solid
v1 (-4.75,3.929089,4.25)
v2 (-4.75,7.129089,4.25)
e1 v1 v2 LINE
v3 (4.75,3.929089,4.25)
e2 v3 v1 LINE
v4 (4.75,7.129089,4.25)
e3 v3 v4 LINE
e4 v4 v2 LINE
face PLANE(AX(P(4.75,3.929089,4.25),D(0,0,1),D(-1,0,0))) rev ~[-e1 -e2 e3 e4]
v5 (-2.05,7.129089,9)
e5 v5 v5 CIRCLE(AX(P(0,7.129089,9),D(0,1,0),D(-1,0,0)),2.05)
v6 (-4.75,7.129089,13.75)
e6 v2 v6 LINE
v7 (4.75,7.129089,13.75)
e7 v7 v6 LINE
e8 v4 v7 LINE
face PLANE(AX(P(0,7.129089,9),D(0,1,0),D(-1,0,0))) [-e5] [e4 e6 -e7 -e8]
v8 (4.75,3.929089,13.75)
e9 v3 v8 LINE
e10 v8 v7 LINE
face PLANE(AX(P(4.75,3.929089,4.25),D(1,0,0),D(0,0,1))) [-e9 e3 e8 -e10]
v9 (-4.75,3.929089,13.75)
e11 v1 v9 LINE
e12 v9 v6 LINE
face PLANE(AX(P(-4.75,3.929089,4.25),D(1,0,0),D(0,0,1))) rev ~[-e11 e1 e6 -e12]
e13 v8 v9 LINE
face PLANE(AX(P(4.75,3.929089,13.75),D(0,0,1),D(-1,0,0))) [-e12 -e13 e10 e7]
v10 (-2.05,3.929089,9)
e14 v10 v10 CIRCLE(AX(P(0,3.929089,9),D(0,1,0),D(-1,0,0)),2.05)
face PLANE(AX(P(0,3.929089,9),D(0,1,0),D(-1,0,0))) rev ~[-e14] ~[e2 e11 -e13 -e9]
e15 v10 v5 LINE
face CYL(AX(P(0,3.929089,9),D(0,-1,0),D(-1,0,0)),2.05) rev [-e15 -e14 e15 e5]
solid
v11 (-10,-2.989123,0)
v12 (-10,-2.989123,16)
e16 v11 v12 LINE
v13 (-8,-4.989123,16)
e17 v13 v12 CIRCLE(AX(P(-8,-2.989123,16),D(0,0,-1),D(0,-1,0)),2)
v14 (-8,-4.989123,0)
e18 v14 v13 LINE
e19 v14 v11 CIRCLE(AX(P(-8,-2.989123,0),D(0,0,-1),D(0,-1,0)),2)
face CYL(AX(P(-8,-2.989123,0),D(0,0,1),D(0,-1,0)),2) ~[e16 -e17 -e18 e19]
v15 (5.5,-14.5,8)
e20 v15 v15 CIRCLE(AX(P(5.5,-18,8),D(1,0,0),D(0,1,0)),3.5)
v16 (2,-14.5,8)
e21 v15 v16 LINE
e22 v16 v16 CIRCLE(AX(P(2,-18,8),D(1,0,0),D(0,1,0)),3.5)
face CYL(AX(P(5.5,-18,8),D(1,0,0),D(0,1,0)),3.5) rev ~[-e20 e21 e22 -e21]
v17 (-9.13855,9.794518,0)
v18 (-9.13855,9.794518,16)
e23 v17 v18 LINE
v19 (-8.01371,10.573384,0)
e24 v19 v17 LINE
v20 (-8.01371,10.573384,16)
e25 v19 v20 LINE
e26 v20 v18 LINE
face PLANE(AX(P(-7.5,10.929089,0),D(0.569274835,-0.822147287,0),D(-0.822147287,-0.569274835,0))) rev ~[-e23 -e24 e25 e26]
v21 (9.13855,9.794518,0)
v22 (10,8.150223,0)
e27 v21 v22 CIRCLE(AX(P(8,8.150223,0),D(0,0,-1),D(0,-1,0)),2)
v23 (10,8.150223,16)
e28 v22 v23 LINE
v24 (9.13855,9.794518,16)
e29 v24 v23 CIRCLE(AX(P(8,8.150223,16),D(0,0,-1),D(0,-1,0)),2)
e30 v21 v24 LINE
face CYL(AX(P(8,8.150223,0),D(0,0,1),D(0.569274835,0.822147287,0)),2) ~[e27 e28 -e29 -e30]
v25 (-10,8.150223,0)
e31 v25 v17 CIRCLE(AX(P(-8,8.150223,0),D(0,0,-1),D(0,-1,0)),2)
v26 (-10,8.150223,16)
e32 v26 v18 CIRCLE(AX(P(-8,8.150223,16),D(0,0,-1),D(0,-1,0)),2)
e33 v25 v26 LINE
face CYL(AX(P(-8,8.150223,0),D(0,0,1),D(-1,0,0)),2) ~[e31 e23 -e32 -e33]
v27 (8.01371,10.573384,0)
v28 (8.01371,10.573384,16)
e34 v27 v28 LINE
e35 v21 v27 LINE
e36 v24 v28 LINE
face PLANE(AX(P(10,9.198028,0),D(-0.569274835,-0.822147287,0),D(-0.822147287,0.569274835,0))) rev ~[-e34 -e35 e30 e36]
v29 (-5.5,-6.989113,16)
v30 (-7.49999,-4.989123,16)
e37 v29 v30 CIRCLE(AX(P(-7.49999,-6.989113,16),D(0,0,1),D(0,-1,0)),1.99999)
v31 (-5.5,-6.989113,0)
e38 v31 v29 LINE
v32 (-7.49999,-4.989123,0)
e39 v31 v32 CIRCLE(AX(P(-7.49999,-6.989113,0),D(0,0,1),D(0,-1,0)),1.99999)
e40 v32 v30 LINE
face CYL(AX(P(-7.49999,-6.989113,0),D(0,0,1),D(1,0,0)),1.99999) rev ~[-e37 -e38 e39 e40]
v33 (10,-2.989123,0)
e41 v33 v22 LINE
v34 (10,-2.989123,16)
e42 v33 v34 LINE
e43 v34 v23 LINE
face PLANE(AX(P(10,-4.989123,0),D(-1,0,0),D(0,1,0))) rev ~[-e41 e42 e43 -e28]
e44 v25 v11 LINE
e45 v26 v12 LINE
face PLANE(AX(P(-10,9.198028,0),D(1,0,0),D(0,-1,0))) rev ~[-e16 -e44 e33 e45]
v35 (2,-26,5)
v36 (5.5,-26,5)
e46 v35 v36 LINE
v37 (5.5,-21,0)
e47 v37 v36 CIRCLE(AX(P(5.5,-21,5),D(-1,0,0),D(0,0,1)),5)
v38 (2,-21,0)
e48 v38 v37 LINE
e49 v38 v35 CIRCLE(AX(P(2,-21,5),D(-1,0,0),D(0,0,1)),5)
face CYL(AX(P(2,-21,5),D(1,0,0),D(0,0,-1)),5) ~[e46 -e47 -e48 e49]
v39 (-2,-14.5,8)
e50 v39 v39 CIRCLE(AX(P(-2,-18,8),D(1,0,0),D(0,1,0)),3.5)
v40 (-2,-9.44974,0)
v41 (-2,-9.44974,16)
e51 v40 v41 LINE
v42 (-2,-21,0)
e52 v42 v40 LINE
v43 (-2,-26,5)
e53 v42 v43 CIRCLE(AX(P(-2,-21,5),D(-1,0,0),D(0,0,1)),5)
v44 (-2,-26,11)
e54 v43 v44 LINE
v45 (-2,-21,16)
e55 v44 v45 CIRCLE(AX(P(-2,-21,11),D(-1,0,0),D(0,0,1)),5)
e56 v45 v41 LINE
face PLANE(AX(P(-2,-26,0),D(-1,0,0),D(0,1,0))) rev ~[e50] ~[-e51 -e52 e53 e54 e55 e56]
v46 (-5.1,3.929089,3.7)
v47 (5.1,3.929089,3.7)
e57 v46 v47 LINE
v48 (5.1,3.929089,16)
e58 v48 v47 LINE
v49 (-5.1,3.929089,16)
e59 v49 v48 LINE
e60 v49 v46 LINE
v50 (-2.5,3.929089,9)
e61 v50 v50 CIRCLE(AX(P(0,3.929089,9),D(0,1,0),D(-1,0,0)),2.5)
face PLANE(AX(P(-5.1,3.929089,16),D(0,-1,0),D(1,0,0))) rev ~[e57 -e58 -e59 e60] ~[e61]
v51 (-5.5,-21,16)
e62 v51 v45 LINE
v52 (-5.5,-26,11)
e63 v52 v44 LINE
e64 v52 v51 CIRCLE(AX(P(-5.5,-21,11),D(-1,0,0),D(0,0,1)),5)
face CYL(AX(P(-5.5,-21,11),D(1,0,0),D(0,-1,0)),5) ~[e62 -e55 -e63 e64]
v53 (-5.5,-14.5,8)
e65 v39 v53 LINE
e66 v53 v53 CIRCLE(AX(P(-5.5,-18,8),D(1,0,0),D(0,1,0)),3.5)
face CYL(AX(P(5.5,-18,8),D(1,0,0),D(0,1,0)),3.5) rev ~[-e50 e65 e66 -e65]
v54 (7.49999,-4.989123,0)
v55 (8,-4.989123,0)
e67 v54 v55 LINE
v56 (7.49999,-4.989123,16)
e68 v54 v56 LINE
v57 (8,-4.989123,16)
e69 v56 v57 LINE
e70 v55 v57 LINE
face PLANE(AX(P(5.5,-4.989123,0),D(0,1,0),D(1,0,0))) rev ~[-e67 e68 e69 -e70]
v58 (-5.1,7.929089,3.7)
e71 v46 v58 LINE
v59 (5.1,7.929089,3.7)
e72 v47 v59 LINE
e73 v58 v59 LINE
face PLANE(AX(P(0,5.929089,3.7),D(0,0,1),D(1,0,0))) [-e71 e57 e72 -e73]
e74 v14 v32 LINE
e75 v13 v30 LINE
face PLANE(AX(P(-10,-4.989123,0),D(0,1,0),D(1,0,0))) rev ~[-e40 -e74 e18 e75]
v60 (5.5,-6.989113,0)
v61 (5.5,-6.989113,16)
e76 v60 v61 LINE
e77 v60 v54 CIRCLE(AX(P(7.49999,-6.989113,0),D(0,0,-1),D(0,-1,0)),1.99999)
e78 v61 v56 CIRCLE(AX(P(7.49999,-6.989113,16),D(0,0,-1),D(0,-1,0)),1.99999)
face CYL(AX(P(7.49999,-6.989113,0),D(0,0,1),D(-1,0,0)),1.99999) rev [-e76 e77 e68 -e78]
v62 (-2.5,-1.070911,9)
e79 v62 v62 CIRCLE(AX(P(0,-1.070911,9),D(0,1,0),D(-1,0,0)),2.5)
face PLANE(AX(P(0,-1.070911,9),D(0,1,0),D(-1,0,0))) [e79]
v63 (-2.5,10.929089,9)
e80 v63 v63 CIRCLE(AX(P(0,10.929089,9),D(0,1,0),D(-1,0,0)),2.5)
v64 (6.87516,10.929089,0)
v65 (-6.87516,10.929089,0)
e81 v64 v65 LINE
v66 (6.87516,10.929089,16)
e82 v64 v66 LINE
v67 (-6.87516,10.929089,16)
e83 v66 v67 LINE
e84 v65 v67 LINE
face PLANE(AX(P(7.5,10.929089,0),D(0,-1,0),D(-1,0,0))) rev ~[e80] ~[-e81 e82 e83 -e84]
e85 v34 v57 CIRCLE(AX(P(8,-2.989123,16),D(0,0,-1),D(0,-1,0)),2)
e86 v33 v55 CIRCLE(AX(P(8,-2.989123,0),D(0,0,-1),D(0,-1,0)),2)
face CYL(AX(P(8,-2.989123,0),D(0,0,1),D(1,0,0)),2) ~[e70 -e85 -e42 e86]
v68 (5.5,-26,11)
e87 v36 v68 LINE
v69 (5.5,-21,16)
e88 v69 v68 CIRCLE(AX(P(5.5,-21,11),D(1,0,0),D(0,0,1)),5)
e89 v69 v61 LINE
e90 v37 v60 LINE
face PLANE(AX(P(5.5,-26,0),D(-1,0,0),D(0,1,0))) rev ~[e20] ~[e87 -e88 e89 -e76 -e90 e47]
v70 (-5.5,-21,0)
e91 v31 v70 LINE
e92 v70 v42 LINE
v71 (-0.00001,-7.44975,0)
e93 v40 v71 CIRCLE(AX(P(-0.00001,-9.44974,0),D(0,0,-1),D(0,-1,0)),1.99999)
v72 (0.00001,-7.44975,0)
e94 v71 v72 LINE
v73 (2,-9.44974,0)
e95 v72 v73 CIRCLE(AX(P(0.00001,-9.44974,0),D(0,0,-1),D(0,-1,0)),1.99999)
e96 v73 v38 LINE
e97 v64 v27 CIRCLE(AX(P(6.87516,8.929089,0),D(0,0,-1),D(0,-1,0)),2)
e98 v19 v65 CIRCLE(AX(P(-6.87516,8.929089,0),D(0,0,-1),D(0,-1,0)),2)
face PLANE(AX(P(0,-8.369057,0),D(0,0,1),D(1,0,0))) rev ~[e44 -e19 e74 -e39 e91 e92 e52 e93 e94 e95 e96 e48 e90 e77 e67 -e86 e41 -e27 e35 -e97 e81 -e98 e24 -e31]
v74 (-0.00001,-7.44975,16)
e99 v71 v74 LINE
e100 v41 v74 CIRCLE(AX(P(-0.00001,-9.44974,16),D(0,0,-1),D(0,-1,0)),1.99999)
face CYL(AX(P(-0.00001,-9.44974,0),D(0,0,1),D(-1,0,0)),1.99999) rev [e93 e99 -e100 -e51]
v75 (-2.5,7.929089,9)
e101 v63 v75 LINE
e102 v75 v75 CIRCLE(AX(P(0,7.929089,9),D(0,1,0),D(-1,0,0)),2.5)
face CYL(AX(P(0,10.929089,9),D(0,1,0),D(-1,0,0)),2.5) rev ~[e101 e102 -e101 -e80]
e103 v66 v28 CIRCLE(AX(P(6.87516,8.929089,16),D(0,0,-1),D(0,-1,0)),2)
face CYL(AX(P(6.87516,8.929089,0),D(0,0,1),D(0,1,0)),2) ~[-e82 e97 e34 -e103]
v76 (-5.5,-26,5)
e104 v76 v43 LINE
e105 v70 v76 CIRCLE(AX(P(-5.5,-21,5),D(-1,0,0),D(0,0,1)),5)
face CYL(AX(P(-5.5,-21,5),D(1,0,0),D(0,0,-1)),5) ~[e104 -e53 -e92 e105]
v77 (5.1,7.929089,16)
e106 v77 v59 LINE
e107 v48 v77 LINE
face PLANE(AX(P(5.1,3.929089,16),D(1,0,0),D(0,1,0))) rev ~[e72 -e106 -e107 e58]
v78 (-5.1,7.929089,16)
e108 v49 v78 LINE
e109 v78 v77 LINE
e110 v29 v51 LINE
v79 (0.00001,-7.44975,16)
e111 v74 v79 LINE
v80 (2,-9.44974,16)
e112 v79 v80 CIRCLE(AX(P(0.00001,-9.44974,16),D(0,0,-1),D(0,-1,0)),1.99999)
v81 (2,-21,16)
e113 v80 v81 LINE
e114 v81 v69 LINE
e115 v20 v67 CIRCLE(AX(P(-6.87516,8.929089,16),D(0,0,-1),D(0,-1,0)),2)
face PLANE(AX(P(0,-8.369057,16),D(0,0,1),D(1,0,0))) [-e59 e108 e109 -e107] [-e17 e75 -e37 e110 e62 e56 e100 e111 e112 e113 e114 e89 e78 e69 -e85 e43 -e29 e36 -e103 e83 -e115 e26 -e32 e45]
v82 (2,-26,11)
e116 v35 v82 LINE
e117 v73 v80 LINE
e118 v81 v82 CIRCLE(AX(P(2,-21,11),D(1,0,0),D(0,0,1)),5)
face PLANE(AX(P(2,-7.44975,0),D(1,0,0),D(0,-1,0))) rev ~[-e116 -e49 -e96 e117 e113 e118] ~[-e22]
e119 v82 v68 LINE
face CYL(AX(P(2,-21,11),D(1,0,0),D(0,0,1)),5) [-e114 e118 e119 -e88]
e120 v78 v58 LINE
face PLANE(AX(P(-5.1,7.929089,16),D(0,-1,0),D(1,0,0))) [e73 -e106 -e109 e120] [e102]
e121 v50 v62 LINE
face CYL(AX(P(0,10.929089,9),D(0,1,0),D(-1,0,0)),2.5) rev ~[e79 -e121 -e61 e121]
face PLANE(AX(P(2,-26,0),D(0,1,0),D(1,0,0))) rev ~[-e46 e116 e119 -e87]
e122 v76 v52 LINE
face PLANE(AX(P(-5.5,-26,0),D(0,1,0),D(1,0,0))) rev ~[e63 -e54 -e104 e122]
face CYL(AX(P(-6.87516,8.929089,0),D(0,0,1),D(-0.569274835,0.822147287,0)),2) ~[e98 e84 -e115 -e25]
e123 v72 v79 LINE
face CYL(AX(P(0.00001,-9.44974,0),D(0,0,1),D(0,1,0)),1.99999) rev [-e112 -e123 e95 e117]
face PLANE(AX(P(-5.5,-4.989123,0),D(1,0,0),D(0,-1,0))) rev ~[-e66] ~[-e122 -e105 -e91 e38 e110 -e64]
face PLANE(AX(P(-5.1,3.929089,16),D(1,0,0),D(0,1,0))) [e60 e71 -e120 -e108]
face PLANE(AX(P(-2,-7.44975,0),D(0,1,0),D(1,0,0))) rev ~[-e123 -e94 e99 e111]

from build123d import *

# Parameters (mm, degrees)
F1_DEPTH  = 16
F2_R      = 2.5
F3_DEPTH  = 12
F4_R      = 3.5
F5_DEPTH  = 11
F6_R      = 1.99999
F7_W      = 10.2
F7_H      = 4
F8_DEPTH  = 12.3
F9_R      = 5
F10_W     = 9.5
F10_H     = 9.5
F10_R     = 2.05
F11_DEPTH = 3.2
F12_R     = 2


# Not quite as in the source:
# - a fillet or chamfer is up to 0.001 mm smaller than in the source, because OpenCascade refuses the exact size


with BuildPart() as f1:
    # F0 (on Top) → F1 (new body)
    with BuildSketch(Plane.XY):
        Polygon((-5.5, -4.9891225062), (-5.5, -26), (-2, -26), (-2, -7.4497503303), (2, -7.4497503303), (2, -26), (5.5, -26), (5.5, -4.9891225062), (10, -4.9891225062), (10, 9.1980283093), (7.5, 10.9290892892), (-7.5, 10.9290892892), (-10, 9.1980283093), (-10, -4.9891225062), align=None)
    extrude(amount=F1_DEPTH)

    # F2 (on face) → F3 (cut)
    with BuildSketch(Plane(origin=(0, 10.9290892892, 0), x_dir=(-1, 0, 0), z_dir=(0, 1, 0))):
        with Locations((0, 9)):
            Circle(F2_R)
    extrude(amount=-F3_DEPTH, mode=Mode.SUBTRACT)

    # F4 (on face) → F5 (cut, through all)
    with BuildSketch(Plane.YZ.offset(5.5)):
        with Locations((-18, 8)):
            Circle(F4_R)
    extrude(amount=-F5_DEPTH, mode=Mode.SUBTRACT)

    # F6 (radius 2 in the source; OpenCascade refuses exactly that, so slightly less here)
    f6_edges = [f1.edges().sort_by_distance(p)[0] for p in [
        (-5.5, -4.989123, 8),
        (2, -7.44975, 8),
        (-2, -7.44975, 8),
        (5.5, -4.989123, 8),
    ]]
    fillet(f6_edges, radius=F6_R)

    # F7 (on face) → F8 (cut)
    with BuildSketch(Plane.XY.offset(16)):
        with Locations((0, 5.9290892892)):
            Rectangle(F7_W, F7_H)
    extrude(amount=-F8_DEPTH, mode=Mode.SUBTRACT)

    # F9
    f9_edges = [f1.edges().sort_by_distance(p)[0] for p in [
        (3.75, -26, 16),
        (3.75, -26, 0),
        (-3.75, -26, 16),
        (-3.75, -26, 0),
    ]]
    fillet(f9_edges, radius=F9_R)

    # F12
    f12_edges = [f1.edges().sort_by_distance(p)[0] for p in [
        (-10, -4.989123, 8),
        (10, -4.989123, 8),
        (-10, 9.198028, 8),
        (-7.5, 10.929089, 8),
        (7.5, 10.929089, 8),
        (10, 9.198028, 8),
    ]]
    fillet(f12_edges, radius=F12_R)


with BuildPart() as f11:
    # F10 (on face) → F11 (new body)
    with BuildSketch(Plane(origin=(0, 3.9290892892, 0), x_dir=(-1, 0, 0), z_dir=(0, 1, 0))):
        with Locations((0, 9)):
            Rectangle(F10_W, F10_H)
        with Locations((0, 9)):
            Circle(F10_R, mode=Mode.SUBTRACT)
    extrude(amount=F11_DEPTH)


solid = Compound([f1.part, f11.part])
